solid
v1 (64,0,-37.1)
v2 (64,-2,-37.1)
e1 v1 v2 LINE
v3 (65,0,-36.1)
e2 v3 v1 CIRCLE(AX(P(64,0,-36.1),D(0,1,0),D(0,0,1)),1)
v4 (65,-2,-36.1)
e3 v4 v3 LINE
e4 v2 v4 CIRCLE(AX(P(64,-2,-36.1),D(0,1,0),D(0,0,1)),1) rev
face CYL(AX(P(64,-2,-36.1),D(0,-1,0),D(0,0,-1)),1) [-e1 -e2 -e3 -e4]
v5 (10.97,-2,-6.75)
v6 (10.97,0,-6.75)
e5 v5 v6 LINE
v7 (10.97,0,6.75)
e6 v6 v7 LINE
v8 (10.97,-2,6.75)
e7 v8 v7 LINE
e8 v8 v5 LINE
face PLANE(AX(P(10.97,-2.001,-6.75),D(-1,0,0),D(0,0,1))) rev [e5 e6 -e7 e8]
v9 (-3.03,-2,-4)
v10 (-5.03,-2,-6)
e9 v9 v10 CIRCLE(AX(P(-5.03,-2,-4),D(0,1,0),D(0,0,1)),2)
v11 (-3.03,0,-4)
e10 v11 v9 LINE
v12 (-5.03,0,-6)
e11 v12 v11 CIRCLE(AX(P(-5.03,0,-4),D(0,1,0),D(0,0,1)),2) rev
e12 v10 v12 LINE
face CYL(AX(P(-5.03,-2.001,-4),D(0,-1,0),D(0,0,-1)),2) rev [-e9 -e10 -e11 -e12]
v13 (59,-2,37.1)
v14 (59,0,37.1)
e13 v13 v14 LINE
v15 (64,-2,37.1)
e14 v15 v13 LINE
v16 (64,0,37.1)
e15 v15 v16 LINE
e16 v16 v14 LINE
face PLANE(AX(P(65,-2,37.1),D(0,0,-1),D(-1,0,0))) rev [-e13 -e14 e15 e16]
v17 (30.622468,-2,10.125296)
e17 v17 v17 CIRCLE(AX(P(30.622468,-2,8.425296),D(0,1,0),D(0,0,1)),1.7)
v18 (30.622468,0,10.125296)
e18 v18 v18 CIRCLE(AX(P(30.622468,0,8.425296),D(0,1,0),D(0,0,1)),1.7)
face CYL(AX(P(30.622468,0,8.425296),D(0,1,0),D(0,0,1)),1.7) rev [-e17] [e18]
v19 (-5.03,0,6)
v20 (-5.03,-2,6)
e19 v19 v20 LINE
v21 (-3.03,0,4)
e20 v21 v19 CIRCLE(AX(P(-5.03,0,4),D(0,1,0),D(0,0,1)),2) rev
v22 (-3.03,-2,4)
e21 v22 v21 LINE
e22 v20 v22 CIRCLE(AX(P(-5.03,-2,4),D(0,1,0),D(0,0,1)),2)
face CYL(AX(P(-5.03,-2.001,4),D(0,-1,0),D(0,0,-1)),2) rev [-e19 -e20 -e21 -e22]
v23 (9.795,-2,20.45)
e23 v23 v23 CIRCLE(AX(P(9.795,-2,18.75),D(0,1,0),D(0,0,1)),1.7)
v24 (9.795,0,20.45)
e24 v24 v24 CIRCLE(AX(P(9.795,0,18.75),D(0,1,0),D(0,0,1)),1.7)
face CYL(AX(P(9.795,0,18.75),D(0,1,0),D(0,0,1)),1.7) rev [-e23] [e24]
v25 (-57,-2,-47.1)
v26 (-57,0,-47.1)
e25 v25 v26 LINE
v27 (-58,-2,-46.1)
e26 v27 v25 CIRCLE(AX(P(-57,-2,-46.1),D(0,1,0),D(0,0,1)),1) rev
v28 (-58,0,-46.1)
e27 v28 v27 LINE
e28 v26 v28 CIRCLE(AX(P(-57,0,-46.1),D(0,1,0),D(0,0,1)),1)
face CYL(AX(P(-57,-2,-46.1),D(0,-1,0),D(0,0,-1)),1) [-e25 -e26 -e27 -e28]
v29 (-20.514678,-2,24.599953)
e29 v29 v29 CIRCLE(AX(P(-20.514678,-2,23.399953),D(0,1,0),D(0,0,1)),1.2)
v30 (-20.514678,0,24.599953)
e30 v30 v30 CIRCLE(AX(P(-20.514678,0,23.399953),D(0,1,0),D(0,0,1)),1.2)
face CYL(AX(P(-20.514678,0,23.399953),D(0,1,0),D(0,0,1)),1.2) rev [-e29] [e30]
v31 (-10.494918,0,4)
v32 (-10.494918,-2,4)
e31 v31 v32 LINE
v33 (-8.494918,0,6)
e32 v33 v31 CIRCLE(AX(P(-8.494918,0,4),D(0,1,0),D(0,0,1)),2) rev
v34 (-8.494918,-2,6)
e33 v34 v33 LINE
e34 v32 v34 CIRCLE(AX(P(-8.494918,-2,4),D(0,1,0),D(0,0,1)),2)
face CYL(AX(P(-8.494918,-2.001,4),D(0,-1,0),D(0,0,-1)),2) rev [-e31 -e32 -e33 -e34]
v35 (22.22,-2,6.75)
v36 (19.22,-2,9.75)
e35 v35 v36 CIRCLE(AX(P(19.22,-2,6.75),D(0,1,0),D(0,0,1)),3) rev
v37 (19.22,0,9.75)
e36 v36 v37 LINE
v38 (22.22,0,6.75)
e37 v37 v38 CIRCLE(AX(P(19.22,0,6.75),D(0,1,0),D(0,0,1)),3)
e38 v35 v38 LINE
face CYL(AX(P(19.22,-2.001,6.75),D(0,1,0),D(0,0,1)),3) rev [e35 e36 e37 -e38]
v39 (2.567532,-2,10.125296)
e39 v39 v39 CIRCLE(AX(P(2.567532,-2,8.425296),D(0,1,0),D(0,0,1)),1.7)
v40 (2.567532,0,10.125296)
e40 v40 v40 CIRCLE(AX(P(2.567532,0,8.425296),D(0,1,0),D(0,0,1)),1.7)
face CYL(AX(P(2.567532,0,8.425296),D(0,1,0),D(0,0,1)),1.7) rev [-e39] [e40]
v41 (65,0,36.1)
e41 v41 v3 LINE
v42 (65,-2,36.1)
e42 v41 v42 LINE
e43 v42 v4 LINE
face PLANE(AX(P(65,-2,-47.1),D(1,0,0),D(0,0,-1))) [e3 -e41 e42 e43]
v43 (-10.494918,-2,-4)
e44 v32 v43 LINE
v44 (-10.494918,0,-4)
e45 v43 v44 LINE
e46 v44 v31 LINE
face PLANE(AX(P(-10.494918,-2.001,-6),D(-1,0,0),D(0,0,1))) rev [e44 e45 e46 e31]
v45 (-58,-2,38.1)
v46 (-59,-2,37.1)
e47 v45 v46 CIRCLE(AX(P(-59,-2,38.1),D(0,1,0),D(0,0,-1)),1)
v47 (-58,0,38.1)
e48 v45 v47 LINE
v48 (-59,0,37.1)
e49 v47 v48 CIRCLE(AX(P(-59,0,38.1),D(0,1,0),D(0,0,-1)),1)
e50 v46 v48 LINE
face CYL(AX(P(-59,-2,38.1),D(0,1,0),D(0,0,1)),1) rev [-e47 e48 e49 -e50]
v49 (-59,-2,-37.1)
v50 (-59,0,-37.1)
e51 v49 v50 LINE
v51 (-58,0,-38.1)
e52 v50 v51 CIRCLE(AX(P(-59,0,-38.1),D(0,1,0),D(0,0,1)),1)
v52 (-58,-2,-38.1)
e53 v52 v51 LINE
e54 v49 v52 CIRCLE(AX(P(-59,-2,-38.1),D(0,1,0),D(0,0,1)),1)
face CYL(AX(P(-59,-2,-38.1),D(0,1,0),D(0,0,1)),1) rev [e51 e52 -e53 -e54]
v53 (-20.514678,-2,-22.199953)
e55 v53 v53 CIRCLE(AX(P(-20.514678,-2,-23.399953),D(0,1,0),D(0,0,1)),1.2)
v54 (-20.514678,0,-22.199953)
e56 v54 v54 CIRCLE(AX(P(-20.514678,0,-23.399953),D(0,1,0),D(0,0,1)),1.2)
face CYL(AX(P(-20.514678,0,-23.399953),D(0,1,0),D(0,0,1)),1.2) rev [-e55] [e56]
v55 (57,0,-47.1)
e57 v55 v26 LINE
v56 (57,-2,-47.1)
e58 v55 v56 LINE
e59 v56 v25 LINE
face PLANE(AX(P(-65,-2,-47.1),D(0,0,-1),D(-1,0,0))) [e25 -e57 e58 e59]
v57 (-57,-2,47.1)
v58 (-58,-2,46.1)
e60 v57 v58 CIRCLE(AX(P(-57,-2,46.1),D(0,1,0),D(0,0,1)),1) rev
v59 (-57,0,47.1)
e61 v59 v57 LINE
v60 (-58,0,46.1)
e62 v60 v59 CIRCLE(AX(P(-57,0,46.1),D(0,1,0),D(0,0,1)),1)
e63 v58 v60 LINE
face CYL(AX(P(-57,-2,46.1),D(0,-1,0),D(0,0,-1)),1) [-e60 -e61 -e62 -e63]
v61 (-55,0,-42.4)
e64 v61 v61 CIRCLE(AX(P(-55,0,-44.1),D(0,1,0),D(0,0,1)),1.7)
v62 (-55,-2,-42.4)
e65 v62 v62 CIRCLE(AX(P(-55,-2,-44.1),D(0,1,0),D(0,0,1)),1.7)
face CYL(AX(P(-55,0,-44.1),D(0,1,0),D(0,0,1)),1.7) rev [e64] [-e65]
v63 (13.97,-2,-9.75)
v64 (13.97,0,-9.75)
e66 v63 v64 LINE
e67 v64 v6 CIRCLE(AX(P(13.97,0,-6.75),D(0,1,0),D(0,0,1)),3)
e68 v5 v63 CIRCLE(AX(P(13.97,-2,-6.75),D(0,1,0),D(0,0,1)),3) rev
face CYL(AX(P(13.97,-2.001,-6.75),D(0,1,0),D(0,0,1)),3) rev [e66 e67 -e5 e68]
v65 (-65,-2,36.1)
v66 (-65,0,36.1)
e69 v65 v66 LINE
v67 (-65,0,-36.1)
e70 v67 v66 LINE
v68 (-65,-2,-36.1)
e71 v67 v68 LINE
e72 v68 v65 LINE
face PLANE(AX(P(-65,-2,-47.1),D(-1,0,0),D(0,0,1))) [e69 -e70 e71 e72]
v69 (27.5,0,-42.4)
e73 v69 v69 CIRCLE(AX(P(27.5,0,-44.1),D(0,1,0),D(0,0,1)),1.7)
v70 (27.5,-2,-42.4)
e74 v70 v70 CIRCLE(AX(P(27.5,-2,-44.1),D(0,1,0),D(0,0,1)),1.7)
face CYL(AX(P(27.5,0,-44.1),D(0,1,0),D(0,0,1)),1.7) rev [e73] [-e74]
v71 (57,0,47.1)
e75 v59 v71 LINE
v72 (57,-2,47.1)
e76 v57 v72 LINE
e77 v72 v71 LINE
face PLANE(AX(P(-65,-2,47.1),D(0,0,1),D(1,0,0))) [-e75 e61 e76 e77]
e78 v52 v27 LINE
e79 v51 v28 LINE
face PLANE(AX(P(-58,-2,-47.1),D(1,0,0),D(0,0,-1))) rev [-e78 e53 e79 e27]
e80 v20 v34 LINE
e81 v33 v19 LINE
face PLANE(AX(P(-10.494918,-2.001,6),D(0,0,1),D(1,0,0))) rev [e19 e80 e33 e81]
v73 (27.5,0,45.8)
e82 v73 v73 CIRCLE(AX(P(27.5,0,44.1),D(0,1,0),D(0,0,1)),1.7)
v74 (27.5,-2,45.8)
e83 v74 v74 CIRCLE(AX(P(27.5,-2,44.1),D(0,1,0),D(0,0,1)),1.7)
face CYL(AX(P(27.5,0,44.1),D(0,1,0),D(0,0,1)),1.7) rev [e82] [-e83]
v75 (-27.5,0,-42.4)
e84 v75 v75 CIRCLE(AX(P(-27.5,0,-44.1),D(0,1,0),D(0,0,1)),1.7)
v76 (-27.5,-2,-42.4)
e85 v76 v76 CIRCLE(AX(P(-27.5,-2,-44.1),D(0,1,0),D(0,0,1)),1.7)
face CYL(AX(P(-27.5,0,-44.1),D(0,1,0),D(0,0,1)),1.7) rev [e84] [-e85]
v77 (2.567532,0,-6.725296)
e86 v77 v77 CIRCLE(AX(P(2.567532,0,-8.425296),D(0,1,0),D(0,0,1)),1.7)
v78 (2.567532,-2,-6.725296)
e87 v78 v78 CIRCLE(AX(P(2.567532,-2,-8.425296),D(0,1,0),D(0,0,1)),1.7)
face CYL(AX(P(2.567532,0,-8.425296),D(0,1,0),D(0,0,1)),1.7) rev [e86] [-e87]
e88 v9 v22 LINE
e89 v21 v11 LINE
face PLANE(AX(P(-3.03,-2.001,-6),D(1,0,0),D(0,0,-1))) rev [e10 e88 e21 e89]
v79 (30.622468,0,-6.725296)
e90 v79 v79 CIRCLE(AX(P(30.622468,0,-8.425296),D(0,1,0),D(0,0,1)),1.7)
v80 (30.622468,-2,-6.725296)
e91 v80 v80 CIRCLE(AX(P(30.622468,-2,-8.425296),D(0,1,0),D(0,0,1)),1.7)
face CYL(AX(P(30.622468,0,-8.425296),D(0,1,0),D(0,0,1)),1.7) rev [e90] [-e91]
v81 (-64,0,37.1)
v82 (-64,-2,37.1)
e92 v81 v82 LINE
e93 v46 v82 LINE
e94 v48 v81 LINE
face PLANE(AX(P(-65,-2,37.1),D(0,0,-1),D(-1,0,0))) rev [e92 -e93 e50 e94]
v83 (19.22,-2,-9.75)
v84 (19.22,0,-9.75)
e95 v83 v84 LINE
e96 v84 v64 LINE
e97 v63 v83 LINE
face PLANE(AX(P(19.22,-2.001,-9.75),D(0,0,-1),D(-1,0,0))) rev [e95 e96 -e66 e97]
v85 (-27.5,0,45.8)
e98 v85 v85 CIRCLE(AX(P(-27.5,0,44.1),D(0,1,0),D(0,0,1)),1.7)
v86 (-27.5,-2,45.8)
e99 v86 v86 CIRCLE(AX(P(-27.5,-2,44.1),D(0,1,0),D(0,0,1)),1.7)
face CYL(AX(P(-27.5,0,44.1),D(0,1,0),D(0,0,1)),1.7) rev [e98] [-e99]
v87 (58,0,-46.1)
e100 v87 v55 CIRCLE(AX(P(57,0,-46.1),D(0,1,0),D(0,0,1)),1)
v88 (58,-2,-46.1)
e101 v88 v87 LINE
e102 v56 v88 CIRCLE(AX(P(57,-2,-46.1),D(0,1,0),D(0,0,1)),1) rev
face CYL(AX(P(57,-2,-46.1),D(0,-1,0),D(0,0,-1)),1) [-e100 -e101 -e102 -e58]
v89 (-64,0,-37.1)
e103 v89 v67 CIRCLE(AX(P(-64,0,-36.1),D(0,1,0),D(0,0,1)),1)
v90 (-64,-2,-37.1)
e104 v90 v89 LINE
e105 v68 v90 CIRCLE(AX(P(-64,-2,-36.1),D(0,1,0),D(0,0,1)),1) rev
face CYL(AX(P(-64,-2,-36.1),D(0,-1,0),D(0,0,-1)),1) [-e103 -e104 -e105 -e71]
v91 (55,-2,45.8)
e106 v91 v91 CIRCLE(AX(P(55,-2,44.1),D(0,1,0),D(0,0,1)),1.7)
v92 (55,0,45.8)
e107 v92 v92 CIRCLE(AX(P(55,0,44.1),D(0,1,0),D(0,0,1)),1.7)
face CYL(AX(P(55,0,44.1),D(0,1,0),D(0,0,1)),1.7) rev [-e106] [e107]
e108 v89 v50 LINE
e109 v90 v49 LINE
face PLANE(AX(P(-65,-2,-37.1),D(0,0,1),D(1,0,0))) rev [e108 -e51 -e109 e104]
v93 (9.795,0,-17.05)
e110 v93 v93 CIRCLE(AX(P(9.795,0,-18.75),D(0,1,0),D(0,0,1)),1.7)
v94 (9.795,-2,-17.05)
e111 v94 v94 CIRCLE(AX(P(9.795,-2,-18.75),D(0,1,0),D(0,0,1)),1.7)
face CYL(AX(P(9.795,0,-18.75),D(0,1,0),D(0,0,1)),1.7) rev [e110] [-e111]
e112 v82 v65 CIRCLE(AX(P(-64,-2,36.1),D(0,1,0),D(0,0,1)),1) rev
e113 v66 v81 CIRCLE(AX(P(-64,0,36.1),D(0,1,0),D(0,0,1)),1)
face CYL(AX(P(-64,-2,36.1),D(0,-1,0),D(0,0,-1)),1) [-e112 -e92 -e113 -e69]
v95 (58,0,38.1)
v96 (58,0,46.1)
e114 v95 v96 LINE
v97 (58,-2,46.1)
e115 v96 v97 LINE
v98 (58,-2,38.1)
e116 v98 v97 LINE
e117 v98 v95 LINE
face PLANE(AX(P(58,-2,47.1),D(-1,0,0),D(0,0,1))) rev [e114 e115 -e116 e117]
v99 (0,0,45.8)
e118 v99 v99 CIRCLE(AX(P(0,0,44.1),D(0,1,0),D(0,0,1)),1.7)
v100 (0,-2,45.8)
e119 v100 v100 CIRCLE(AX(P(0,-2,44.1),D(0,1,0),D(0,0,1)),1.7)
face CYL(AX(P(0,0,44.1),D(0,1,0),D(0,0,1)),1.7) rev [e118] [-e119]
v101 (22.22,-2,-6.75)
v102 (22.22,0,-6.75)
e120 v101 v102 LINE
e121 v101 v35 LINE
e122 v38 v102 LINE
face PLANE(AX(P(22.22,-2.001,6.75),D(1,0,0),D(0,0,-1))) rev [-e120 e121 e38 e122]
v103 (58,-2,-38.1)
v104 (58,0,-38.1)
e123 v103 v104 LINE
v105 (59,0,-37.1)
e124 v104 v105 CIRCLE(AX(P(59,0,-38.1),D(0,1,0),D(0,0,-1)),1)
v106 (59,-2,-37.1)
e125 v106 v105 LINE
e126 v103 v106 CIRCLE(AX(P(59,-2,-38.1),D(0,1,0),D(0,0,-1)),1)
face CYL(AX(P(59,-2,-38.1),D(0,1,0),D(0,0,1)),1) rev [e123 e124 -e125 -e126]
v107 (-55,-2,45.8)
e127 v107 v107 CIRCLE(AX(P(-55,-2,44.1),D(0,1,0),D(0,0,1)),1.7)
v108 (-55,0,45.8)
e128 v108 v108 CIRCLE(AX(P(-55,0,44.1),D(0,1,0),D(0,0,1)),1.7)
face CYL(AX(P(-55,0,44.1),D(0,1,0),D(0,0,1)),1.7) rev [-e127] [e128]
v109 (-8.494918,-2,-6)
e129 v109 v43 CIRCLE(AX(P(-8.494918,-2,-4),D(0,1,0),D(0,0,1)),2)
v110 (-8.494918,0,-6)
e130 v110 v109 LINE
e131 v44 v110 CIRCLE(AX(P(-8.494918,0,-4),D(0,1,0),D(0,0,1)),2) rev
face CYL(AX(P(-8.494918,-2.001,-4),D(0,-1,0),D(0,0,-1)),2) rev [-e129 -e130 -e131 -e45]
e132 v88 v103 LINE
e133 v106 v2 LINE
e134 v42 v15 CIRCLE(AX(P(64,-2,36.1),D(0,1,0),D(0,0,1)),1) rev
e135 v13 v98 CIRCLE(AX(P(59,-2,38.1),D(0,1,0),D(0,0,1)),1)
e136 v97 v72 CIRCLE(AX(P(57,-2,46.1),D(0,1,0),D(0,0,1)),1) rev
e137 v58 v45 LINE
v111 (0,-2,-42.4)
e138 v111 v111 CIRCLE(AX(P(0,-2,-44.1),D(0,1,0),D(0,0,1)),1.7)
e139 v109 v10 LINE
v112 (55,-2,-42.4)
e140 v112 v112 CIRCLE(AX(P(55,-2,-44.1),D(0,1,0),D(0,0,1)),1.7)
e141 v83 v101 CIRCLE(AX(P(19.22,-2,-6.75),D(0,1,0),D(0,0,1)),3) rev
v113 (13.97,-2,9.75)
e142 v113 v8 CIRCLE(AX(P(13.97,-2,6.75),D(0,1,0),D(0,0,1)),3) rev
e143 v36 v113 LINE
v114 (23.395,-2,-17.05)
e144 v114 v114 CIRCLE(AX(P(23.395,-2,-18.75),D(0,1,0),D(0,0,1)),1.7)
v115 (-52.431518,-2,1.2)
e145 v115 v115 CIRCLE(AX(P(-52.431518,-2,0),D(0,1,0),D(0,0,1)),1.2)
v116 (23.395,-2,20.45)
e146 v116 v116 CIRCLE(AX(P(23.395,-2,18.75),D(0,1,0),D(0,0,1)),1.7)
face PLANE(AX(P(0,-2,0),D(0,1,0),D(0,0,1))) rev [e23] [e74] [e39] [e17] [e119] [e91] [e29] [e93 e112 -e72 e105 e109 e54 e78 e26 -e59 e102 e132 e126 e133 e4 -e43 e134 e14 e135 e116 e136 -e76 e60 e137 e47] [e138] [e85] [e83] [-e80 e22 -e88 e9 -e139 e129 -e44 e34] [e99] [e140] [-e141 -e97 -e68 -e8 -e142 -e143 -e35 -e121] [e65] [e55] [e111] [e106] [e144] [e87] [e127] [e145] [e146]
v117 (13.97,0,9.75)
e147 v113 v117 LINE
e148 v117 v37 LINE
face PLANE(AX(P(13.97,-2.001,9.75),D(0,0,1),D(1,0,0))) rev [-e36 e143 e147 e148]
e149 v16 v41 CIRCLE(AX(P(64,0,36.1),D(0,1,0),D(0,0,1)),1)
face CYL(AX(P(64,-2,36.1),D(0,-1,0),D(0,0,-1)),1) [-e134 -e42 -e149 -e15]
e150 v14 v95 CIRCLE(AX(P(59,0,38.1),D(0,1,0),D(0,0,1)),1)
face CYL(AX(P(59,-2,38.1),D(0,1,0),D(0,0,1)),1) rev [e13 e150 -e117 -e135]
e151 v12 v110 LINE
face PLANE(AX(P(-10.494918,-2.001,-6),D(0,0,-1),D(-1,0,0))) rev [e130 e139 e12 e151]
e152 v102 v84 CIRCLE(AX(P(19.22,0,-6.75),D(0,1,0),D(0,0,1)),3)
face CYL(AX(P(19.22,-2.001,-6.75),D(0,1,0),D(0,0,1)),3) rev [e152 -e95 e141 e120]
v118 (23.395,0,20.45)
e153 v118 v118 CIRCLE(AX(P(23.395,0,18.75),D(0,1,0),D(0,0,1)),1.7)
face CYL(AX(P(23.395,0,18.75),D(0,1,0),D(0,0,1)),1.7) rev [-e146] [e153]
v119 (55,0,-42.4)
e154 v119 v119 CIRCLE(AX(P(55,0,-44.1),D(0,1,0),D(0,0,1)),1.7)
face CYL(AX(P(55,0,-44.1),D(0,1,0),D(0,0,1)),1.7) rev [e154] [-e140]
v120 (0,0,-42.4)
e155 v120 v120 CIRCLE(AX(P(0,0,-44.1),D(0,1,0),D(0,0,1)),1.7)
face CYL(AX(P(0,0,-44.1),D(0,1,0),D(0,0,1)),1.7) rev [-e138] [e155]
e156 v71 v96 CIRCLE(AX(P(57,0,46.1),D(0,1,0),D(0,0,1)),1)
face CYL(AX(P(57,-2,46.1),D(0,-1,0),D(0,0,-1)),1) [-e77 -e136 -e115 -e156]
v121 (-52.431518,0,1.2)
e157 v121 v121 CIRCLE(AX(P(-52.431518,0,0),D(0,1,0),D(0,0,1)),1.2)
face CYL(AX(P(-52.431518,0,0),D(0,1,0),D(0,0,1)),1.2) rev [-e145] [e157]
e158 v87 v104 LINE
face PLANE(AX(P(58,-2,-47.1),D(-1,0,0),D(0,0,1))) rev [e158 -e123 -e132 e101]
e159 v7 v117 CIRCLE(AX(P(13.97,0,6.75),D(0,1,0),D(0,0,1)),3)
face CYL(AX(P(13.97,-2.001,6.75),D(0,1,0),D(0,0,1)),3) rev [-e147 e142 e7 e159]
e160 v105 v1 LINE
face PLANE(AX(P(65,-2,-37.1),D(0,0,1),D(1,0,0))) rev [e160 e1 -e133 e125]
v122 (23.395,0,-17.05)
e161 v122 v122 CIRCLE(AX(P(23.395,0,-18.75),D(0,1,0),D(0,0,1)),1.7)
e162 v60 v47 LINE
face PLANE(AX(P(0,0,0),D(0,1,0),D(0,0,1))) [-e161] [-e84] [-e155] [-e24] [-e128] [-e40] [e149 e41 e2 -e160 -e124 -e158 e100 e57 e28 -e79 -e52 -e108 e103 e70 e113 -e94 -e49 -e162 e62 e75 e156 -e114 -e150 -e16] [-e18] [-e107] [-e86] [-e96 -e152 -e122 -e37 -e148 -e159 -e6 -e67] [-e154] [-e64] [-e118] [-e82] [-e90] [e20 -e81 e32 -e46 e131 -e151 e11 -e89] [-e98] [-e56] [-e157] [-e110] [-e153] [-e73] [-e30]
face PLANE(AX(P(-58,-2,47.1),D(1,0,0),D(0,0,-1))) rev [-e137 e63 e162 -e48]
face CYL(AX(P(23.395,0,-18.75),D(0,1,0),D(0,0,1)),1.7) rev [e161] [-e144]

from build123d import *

# Parameters (mm, degrees)
SKETCH_1_W             = 130
SKETCH_1_H             = 94.2
SM_BASE_FLANGE_1_DEPTH = 2
HOLE_WIZARD_M3_1_D     = 3.4
HOLE_WIZARD_M3_2_D     = 3.4
CUT_EXTRUDE_1_REACH    = 82.296
CUT_EXTRUDE_2_REACH    = 82.296
SKETCH_10_W            = 7.464918405
SKETCH_10_H            = 12
FILLET_2_R             = 2
HOLE_WIZARD_M2_1_D     = 2.4
CUT_EXTRUDE_3_DEPTH    = 81.295765766
FILLET_3_R             = 1


# Sheet-metal steps are written as plain solids
with BuildPart() as part:
    # Sketch 1 → 基体-法兰1 (new body)
    with BuildSketch(Plane(origin=(0, 0, 0), x_dir=(1, 0, 0), z_dir=(0, 1, 0))):
        Rectangle(SKETCH_1_W, SKETCH_1_H)
    extrude(amount=-SM_BASE_FLANGE_1_DEPTH)

    # M3 间隙孔1 (through all)
    with Locations(Plane(origin=(0, 0, 0), x_dir=(1, 0, 0), z_dir=(0, 1, 0))):
        with Locations((-55, -44.1), (-27.5, -44.1), (0, -44.1), (27.5, -44.1), (55, -44.1), (55, 44.1), (27.5, 44.1), (0, 44.1), (-27.5, 44.1), (-55, 44.1)):
            Hole(HOLE_WIZARD_M3_1_D / 2)

    # M3 间隙孔2 (through all)
    with Locations(Plane(origin=(0, 0, 0), x_dir=(1, 0, 0), z_dir=(0, 1, 0))):
        with Locations((2.567531914, -8.425296044), (2.567531914, 8.425296044), (9.795, 18.75), (23.395, 18.75), (30.622468086, 8.425296044), (30.622468086, -8.425296044), (23.395, -18.75), (9.795, -18.75)):
            Hole(HOLE_WIZARD_M3_2_D / 2)

    # 草图8 → 切除-拉伸1 (cut, up to next)
    with BuildSketch(Plane(origin=(0, 0, 0), x_dir=(1, 0, 0), z_dir=(0, 1, 0)), mode=Mode.PRIVATE) as cut_extrude_1_sk1:
        with BuildLine():
            Line((19.22, 9.75), (13.97, 9.75))
            ThreePointArc((13.97, 9.75), (11.848679656, 8.871320344), (10.97, 6.75))
            Line((10.97, 6.75), (10.97, -6.75))
            ThreePointArc((10.97, -6.75), (11.848679656, -8.871320344), (13.97, -9.75))
            Line((13.97, -9.75), (19.22, -9.75))
            ThreePointArc((19.22, -9.75), (21.341320344, -8.871320344), (22.22, -6.75))
            Line((22.22, -6.75), (22.22, 6.75))
            ThreePointArc((22.22, 6.75), (21.341320344, 8.871320344), (19.22, 9.75))
        make_face()
    cut_extrude_1_tool1 = extrude(cut_extrude_1_sk1.sketch, amount=-CUT_EXTRUDE_1_REACH, mode=Mode.PRIVATE) & part.part
    add(cut_extrude_1_tool1.solids().sort_by_distance((16.595, 0, 0))[0], mode=Mode.SUBTRACT)

    # 草图10 → 切除-拉伸2 (cut, up to next)
    with BuildSketch(Plane(origin=(0, 0, 0), x_dir=(1, 0, 0), z_dir=(0, 1, 0)), mode=Mode.PRIVATE) as cut_extrude_2_sk1:
        with Locations((-6.762459203, 0)):
            Rectangle(SKETCH_10_W, SKETCH_10_H)
    cut_extrude_2_tool1 = extrude(cut_extrude_2_sk1.sketch, amount=-CUT_EXTRUDE_2_REACH, mode=Mode.PRIVATE) & part.part
    add(cut_extrude_2_tool1.solids().sort_by_distance((-6.762459, 0, 0))[0], mode=Mode.SUBTRACT)

    # 圆角2
    fillet_2_edges = [part.edges().sort_by_distance(p)[0] for p in [
        (-10.494918405, -1, 6),
        (-10.494918405, -1, -6),
        (-3.03, -1, -6),
        (-3.03, -1, 6),
    ]]
    fillet(fillet_2_edges, radius=FILLET_2_R)

    # M2 间隙孔1 (through all)
    with Locations(Plane(origin=(0, 0, 0), x_dir=(1, 0, 0), z_dir=(0, 1, 0))):
        with Locations((-20.514677996, 23.3999532), (-20.514677996, -23.3999532), (-52.431517644, 0)):
            Hole(HOLE_WIZARD_M2_1_D / 2)

    # 草图14 → 切除-拉伸3 (cut, through all)
    with BuildSketch(Plane(origin=(0, 0, 0), x_dir=(1, 0, 0), z_dir=(0, 1, 0))):
        with BuildLine():
            Line((-65, 47.1), (-58, 47.1))
            Line((-58, 47.1), (-58, 38.1))
            ThreePointArc((-58, 38.1), (-58.292893219, 37.392893219), (-59, 37.1))
            Line((-59, 37.1), (-65, 37.1))
            Line((-65, 37.1), (-65, 47.1))
        make_face()
        with BuildLine():
            Line((-58, -47.1), (-58, -38.1))
            ThreePointArc((-58, -38.1), (-58.292893219, -37.392893219), (-59, -37.1))
            Line((-59, -37.1), (-65, -37.1))
            Line((-65, -37.1), (-65, -47.1))
            Line((-65, -47.1), (-58, -47.1))
        make_face()
        with BuildLine():
            Line((65, -47.1), (58, -47.1))
            Line((58, -47.1), (58, -38.1))
            ThreePointArc((58, -38.1), (58.292893219, -37.392893219), (59, -37.1))
            Line((59, -37.1), (65, -37.1))
            Line((65, -37.1), (65, -47.1))
        make_face()
        with BuildLine():
            Line((58, 47.1), (58, 38.1))
            ThreePointArc((58, 38.1), (58.292893219, 37.392893219), (59, 37.1))
            Line((59, 37.1), (65, 37.1))
            Line((65, 37.1), (65, 47.1))
            Line((65, 47.1), (58, 47.1))
        make_face()
    extrude(amount=-CUT_EXTRUDE_3_DEPTH, mode=Mode.SUBTRACT)

    # 圆角3
    fillet_3_edges = [part.edges().sort_by_distance(p)[0] for p in [
        (58, -1, -47.1),
        (65, -1, -37.1),
        (65, -1, 37.1),
        (58, -1, 47.1),
        (-58, -1, 47.1),
        (-65, -1, 37.1),
        (-65, -1, -37.1),
        (-58, -1, -47.1),
    ]]
    fillet(fillet_3_edges, radius=FILLET_3_R)


solid = part.part
